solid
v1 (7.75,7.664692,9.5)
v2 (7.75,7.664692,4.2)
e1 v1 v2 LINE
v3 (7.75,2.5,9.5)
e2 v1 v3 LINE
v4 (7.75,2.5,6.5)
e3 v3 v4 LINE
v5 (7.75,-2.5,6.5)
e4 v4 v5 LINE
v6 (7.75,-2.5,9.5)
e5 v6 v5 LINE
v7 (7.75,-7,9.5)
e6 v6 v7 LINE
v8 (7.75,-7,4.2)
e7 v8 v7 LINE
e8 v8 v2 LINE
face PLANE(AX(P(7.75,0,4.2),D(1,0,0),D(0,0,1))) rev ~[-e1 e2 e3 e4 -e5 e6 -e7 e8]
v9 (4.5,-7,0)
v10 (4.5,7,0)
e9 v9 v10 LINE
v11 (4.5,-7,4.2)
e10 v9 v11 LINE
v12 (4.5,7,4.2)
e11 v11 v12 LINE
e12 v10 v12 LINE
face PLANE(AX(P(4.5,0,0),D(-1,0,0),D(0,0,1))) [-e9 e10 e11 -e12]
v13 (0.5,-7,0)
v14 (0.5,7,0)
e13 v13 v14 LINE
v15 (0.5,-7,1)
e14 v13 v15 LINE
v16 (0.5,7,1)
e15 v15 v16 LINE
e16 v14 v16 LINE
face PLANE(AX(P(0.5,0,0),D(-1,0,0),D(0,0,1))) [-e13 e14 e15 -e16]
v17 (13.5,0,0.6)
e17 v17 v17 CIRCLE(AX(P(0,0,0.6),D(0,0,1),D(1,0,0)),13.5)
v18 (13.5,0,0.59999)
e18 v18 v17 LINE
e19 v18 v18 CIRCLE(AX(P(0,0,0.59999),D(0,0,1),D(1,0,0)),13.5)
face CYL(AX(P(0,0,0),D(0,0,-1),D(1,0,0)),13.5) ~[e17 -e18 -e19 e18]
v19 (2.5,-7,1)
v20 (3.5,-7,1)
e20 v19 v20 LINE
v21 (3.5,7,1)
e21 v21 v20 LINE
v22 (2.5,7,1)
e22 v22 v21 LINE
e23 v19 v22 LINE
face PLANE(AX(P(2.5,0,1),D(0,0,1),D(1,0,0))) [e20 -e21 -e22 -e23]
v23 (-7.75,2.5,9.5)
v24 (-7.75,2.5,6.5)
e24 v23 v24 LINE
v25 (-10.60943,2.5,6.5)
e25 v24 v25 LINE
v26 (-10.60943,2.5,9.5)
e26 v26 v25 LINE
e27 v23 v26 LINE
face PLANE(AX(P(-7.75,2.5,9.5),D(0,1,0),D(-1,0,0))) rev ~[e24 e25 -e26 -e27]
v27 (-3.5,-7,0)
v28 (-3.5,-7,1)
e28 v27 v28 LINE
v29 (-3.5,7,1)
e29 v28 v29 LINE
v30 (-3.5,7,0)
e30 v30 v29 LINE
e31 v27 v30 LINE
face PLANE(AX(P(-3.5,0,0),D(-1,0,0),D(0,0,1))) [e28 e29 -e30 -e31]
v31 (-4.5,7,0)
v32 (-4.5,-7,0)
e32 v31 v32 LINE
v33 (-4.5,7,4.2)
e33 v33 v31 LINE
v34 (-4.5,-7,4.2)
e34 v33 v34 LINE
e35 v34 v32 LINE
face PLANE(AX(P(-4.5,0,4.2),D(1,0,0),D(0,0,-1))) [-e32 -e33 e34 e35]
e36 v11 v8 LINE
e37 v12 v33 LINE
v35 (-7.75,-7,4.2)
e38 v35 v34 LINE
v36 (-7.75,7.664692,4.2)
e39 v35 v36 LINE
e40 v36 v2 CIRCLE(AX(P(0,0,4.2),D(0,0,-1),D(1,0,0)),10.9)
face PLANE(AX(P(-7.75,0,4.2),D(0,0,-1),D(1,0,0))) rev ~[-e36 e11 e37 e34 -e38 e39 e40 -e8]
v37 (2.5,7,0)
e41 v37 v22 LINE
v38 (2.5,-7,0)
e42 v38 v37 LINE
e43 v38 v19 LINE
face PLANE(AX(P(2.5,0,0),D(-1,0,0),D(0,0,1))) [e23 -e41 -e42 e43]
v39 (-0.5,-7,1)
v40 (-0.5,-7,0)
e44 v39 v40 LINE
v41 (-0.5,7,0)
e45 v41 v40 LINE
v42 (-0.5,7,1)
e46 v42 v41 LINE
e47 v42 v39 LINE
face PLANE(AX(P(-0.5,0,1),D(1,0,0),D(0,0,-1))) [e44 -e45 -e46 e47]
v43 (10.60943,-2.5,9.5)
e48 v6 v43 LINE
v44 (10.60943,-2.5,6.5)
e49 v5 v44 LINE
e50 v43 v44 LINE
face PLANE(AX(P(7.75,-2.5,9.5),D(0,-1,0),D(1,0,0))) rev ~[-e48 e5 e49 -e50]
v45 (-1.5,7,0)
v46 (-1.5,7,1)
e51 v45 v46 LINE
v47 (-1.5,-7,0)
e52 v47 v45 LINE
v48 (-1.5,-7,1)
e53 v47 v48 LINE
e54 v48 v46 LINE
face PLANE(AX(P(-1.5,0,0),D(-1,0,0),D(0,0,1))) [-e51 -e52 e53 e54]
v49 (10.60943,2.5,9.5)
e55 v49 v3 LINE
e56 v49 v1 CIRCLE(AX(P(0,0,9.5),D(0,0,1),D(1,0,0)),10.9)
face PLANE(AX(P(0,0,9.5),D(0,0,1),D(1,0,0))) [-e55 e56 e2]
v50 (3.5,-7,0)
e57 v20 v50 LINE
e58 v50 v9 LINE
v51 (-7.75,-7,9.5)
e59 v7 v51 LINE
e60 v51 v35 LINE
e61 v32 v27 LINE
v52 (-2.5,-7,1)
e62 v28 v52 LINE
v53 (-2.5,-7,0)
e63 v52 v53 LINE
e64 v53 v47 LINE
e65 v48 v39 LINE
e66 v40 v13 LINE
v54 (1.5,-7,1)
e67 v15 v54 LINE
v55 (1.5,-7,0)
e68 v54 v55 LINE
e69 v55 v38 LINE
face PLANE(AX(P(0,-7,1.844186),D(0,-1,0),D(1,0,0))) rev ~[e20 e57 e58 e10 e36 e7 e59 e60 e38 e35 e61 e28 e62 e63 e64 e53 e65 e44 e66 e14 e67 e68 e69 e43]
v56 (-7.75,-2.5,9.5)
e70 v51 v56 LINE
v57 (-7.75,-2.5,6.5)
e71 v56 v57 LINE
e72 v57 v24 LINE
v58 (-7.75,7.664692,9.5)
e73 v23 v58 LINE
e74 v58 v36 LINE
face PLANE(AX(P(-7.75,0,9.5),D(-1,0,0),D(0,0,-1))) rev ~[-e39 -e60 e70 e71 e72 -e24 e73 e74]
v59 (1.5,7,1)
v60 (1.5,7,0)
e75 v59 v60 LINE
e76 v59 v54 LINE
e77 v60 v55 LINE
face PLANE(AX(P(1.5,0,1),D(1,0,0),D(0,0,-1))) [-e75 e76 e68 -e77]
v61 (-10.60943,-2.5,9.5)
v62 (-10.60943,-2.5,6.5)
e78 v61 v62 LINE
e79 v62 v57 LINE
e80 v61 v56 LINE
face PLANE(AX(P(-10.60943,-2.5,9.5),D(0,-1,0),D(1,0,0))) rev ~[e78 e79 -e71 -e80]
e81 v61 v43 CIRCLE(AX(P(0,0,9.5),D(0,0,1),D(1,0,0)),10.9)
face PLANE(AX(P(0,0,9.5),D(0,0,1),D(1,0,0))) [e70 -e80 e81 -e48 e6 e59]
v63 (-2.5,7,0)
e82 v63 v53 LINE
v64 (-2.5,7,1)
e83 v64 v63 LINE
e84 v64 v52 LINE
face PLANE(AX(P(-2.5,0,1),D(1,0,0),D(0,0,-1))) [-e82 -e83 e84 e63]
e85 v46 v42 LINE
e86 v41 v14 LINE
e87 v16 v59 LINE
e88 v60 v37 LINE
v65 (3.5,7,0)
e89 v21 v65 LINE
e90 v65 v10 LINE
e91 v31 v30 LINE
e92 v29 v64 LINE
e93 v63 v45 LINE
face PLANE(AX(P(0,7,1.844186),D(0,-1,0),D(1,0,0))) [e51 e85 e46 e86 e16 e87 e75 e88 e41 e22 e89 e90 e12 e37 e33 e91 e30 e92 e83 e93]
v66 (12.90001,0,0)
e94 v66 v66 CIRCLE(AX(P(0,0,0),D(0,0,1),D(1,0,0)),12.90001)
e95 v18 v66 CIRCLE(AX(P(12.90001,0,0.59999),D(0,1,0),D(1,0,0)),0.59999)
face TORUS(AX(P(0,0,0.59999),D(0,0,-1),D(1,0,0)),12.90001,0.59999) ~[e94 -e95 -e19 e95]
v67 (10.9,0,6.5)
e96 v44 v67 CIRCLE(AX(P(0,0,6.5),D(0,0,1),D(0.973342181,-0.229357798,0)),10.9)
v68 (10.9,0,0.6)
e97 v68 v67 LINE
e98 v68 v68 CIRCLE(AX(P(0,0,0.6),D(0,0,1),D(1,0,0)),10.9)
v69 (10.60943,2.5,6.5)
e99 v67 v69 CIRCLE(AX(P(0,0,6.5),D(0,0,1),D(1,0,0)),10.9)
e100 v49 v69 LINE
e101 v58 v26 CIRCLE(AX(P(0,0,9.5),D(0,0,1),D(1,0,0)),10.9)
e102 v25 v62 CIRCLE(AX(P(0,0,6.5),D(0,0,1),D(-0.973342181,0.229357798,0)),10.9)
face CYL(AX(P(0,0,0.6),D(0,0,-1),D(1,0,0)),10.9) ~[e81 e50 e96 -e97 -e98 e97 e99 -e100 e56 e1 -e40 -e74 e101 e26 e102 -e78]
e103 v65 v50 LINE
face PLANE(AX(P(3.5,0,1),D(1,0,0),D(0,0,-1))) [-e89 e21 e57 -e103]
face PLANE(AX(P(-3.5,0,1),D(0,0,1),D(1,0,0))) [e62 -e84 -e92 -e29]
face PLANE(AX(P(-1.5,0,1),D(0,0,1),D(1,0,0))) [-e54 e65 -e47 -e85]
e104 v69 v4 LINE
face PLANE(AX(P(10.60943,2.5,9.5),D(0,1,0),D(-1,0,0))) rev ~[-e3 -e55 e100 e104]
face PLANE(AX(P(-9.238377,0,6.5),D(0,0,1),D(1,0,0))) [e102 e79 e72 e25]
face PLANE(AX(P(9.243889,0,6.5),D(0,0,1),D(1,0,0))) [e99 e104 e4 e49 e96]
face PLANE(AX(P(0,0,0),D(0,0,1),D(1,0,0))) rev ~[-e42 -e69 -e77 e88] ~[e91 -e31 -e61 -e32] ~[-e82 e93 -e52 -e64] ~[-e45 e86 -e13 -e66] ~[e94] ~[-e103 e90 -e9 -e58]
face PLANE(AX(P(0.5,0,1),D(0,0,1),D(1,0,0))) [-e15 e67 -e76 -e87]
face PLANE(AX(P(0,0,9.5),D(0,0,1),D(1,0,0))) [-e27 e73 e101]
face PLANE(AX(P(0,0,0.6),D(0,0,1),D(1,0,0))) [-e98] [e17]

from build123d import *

# Parameters (mm, degrees)
F0_R      = 13.5
F1_DEPTH  = 0.6
F2_R      = 0.59999
F5_R      = 10.9
F6_DEPTH  = 8.9
F9_DEPTH  = 7
F10_DEPTH = 7
F11_DEPTH = 25
F12_DEPTH = 7
F14_DEPTH = 3


# Not quite as in the source:
# - a fillet or chamfer is up to 0.001 mm smaller than in the source, because OpenCascade refuses the exact size


with BuildPart() as f1:
    # F0 (on Top) → F1 (new body)
    with BuildSketch(Plane.XY):
        Circle(F0_R)
    extrude(amount=F1_DEPTH)

    # F2 (radius 0.6 in the source; OpenCascade refuses exactly that, so slightly less here)
    f2_edges = [f1.edges().sort_by_distance(p)[0] for p in [
        (-13.5, 0, 0),
    ]]
    fillet(f2_edges, radius=F2_R)

    # F5 (on face) → F6 (join)
    with BuildSketch(Plane.XY.offset(0.6)):
        Circle(F5_R)
    extrude(amount=F6_DEPTH)

    # F3 (on Front) → F9 (cut)
    with BuildSketch(Plane.XZ):
        Polygon((-0.5, 0), (0, 0), (0.5, 0), (0.5, 1), (1.5, 1), (1.5, 0), (2.5, 0), (2.5, 1), (3.5, 1), (3.5, 0), (4.5, 0), (4.5, 4.2), (-4.5, 4.2), (-4.5, 0), (-3.5, 0), (-3.5, 1), (-2.5, 1), (-2.5, 0), (-1.5, 0), (-1.5, 1), (-0.5, 1), align=None)
    extrude(amount=-F9_DEPTH, mode=Mode.SUBTRACT)

    # F4 (on Front) → F10 (cut)
    with BuildSketch(Plane.XZ):
        Polygon((-0.5, 0), (0, 0), (0.5, 0), (0.5, 1), (1.5, 1), (1.5, 0), (2.5, 0), (2.5, 1), (3.5, 1), (3.5, 0), (4.5, 0), (4.5, 4.2), (-4.5, 4.2), (-4.5, 0), (-3.5, 0), (-3.5, 1), (-2.5, 1), (-2.5, 0), (-1.5, 0), (-1.5, 1), (-0.5, 1), align=None)
    extrude(amount=F10_DEPTH, mode=Mode.SUBTRACT)

    # F7 (on Front) → F11 (cut)
    with BuildSketch(Plane.XZ):
        Polygon((-7.75, 4.2), (0, 4.2), (7.75, 4.2), (7.75, 9.5), (-7.75, 9.5), align=None)
    extrude(amount=-F11_DEPTH, mode=Mode.SUBTRACT)

    # F8 (on Front) → F12 (cut)
    with BuildSketch(Plane.XZ):
        Polygon((-7.75, 4.2), (0, 4.2), (7.75, 4.2), (7.75, 9.5), (-7.75, 9.5), align=None)
    extrude(amount=F12_DEPTH, mode=Mode.SUBTRACT)

    # F13 (on face) → F14 (cut)
    with BuildSketch(Plane.XY.offset(9.5)):
        with BuildLine():
            Line((-7.75, -2.5), (-7.75, 0))
            Line((-7.75, 0), (-7.75, 2.5))
            Line((-7.75, 2.5), (-10.6094297679, 2.5))
            ThreePointArc((-10.6094297679, 2.5), (-10.9, 0), (-10.6094297679, -2.5))
            Line((-10.6094297679, -2.5), (-7.75, -2.5))
        make_face()
        with BuildLine():
            Line((7.75, 2.5), (7.75, 0))
            Line((7.75, 0), (7.75, -2.5))
            Line((7.75, -2.5), (10.6094297679, -2.5))
            ThreePointArc((10.6094297679, -2.5), (10.8271137537, -1.2584147826), (10.9, 0))
            ThreePointArc((10.9, 0), (10.8271137537, 1.2584147826), (10.6094297679, 2.5))
            Line((10.6094297679, 2.5), (7.75, 2.5))
        make_face()
    extrude(amount=-F14_DEPTH, mode=Mode.SUBTRACT)


solid = f1.part
